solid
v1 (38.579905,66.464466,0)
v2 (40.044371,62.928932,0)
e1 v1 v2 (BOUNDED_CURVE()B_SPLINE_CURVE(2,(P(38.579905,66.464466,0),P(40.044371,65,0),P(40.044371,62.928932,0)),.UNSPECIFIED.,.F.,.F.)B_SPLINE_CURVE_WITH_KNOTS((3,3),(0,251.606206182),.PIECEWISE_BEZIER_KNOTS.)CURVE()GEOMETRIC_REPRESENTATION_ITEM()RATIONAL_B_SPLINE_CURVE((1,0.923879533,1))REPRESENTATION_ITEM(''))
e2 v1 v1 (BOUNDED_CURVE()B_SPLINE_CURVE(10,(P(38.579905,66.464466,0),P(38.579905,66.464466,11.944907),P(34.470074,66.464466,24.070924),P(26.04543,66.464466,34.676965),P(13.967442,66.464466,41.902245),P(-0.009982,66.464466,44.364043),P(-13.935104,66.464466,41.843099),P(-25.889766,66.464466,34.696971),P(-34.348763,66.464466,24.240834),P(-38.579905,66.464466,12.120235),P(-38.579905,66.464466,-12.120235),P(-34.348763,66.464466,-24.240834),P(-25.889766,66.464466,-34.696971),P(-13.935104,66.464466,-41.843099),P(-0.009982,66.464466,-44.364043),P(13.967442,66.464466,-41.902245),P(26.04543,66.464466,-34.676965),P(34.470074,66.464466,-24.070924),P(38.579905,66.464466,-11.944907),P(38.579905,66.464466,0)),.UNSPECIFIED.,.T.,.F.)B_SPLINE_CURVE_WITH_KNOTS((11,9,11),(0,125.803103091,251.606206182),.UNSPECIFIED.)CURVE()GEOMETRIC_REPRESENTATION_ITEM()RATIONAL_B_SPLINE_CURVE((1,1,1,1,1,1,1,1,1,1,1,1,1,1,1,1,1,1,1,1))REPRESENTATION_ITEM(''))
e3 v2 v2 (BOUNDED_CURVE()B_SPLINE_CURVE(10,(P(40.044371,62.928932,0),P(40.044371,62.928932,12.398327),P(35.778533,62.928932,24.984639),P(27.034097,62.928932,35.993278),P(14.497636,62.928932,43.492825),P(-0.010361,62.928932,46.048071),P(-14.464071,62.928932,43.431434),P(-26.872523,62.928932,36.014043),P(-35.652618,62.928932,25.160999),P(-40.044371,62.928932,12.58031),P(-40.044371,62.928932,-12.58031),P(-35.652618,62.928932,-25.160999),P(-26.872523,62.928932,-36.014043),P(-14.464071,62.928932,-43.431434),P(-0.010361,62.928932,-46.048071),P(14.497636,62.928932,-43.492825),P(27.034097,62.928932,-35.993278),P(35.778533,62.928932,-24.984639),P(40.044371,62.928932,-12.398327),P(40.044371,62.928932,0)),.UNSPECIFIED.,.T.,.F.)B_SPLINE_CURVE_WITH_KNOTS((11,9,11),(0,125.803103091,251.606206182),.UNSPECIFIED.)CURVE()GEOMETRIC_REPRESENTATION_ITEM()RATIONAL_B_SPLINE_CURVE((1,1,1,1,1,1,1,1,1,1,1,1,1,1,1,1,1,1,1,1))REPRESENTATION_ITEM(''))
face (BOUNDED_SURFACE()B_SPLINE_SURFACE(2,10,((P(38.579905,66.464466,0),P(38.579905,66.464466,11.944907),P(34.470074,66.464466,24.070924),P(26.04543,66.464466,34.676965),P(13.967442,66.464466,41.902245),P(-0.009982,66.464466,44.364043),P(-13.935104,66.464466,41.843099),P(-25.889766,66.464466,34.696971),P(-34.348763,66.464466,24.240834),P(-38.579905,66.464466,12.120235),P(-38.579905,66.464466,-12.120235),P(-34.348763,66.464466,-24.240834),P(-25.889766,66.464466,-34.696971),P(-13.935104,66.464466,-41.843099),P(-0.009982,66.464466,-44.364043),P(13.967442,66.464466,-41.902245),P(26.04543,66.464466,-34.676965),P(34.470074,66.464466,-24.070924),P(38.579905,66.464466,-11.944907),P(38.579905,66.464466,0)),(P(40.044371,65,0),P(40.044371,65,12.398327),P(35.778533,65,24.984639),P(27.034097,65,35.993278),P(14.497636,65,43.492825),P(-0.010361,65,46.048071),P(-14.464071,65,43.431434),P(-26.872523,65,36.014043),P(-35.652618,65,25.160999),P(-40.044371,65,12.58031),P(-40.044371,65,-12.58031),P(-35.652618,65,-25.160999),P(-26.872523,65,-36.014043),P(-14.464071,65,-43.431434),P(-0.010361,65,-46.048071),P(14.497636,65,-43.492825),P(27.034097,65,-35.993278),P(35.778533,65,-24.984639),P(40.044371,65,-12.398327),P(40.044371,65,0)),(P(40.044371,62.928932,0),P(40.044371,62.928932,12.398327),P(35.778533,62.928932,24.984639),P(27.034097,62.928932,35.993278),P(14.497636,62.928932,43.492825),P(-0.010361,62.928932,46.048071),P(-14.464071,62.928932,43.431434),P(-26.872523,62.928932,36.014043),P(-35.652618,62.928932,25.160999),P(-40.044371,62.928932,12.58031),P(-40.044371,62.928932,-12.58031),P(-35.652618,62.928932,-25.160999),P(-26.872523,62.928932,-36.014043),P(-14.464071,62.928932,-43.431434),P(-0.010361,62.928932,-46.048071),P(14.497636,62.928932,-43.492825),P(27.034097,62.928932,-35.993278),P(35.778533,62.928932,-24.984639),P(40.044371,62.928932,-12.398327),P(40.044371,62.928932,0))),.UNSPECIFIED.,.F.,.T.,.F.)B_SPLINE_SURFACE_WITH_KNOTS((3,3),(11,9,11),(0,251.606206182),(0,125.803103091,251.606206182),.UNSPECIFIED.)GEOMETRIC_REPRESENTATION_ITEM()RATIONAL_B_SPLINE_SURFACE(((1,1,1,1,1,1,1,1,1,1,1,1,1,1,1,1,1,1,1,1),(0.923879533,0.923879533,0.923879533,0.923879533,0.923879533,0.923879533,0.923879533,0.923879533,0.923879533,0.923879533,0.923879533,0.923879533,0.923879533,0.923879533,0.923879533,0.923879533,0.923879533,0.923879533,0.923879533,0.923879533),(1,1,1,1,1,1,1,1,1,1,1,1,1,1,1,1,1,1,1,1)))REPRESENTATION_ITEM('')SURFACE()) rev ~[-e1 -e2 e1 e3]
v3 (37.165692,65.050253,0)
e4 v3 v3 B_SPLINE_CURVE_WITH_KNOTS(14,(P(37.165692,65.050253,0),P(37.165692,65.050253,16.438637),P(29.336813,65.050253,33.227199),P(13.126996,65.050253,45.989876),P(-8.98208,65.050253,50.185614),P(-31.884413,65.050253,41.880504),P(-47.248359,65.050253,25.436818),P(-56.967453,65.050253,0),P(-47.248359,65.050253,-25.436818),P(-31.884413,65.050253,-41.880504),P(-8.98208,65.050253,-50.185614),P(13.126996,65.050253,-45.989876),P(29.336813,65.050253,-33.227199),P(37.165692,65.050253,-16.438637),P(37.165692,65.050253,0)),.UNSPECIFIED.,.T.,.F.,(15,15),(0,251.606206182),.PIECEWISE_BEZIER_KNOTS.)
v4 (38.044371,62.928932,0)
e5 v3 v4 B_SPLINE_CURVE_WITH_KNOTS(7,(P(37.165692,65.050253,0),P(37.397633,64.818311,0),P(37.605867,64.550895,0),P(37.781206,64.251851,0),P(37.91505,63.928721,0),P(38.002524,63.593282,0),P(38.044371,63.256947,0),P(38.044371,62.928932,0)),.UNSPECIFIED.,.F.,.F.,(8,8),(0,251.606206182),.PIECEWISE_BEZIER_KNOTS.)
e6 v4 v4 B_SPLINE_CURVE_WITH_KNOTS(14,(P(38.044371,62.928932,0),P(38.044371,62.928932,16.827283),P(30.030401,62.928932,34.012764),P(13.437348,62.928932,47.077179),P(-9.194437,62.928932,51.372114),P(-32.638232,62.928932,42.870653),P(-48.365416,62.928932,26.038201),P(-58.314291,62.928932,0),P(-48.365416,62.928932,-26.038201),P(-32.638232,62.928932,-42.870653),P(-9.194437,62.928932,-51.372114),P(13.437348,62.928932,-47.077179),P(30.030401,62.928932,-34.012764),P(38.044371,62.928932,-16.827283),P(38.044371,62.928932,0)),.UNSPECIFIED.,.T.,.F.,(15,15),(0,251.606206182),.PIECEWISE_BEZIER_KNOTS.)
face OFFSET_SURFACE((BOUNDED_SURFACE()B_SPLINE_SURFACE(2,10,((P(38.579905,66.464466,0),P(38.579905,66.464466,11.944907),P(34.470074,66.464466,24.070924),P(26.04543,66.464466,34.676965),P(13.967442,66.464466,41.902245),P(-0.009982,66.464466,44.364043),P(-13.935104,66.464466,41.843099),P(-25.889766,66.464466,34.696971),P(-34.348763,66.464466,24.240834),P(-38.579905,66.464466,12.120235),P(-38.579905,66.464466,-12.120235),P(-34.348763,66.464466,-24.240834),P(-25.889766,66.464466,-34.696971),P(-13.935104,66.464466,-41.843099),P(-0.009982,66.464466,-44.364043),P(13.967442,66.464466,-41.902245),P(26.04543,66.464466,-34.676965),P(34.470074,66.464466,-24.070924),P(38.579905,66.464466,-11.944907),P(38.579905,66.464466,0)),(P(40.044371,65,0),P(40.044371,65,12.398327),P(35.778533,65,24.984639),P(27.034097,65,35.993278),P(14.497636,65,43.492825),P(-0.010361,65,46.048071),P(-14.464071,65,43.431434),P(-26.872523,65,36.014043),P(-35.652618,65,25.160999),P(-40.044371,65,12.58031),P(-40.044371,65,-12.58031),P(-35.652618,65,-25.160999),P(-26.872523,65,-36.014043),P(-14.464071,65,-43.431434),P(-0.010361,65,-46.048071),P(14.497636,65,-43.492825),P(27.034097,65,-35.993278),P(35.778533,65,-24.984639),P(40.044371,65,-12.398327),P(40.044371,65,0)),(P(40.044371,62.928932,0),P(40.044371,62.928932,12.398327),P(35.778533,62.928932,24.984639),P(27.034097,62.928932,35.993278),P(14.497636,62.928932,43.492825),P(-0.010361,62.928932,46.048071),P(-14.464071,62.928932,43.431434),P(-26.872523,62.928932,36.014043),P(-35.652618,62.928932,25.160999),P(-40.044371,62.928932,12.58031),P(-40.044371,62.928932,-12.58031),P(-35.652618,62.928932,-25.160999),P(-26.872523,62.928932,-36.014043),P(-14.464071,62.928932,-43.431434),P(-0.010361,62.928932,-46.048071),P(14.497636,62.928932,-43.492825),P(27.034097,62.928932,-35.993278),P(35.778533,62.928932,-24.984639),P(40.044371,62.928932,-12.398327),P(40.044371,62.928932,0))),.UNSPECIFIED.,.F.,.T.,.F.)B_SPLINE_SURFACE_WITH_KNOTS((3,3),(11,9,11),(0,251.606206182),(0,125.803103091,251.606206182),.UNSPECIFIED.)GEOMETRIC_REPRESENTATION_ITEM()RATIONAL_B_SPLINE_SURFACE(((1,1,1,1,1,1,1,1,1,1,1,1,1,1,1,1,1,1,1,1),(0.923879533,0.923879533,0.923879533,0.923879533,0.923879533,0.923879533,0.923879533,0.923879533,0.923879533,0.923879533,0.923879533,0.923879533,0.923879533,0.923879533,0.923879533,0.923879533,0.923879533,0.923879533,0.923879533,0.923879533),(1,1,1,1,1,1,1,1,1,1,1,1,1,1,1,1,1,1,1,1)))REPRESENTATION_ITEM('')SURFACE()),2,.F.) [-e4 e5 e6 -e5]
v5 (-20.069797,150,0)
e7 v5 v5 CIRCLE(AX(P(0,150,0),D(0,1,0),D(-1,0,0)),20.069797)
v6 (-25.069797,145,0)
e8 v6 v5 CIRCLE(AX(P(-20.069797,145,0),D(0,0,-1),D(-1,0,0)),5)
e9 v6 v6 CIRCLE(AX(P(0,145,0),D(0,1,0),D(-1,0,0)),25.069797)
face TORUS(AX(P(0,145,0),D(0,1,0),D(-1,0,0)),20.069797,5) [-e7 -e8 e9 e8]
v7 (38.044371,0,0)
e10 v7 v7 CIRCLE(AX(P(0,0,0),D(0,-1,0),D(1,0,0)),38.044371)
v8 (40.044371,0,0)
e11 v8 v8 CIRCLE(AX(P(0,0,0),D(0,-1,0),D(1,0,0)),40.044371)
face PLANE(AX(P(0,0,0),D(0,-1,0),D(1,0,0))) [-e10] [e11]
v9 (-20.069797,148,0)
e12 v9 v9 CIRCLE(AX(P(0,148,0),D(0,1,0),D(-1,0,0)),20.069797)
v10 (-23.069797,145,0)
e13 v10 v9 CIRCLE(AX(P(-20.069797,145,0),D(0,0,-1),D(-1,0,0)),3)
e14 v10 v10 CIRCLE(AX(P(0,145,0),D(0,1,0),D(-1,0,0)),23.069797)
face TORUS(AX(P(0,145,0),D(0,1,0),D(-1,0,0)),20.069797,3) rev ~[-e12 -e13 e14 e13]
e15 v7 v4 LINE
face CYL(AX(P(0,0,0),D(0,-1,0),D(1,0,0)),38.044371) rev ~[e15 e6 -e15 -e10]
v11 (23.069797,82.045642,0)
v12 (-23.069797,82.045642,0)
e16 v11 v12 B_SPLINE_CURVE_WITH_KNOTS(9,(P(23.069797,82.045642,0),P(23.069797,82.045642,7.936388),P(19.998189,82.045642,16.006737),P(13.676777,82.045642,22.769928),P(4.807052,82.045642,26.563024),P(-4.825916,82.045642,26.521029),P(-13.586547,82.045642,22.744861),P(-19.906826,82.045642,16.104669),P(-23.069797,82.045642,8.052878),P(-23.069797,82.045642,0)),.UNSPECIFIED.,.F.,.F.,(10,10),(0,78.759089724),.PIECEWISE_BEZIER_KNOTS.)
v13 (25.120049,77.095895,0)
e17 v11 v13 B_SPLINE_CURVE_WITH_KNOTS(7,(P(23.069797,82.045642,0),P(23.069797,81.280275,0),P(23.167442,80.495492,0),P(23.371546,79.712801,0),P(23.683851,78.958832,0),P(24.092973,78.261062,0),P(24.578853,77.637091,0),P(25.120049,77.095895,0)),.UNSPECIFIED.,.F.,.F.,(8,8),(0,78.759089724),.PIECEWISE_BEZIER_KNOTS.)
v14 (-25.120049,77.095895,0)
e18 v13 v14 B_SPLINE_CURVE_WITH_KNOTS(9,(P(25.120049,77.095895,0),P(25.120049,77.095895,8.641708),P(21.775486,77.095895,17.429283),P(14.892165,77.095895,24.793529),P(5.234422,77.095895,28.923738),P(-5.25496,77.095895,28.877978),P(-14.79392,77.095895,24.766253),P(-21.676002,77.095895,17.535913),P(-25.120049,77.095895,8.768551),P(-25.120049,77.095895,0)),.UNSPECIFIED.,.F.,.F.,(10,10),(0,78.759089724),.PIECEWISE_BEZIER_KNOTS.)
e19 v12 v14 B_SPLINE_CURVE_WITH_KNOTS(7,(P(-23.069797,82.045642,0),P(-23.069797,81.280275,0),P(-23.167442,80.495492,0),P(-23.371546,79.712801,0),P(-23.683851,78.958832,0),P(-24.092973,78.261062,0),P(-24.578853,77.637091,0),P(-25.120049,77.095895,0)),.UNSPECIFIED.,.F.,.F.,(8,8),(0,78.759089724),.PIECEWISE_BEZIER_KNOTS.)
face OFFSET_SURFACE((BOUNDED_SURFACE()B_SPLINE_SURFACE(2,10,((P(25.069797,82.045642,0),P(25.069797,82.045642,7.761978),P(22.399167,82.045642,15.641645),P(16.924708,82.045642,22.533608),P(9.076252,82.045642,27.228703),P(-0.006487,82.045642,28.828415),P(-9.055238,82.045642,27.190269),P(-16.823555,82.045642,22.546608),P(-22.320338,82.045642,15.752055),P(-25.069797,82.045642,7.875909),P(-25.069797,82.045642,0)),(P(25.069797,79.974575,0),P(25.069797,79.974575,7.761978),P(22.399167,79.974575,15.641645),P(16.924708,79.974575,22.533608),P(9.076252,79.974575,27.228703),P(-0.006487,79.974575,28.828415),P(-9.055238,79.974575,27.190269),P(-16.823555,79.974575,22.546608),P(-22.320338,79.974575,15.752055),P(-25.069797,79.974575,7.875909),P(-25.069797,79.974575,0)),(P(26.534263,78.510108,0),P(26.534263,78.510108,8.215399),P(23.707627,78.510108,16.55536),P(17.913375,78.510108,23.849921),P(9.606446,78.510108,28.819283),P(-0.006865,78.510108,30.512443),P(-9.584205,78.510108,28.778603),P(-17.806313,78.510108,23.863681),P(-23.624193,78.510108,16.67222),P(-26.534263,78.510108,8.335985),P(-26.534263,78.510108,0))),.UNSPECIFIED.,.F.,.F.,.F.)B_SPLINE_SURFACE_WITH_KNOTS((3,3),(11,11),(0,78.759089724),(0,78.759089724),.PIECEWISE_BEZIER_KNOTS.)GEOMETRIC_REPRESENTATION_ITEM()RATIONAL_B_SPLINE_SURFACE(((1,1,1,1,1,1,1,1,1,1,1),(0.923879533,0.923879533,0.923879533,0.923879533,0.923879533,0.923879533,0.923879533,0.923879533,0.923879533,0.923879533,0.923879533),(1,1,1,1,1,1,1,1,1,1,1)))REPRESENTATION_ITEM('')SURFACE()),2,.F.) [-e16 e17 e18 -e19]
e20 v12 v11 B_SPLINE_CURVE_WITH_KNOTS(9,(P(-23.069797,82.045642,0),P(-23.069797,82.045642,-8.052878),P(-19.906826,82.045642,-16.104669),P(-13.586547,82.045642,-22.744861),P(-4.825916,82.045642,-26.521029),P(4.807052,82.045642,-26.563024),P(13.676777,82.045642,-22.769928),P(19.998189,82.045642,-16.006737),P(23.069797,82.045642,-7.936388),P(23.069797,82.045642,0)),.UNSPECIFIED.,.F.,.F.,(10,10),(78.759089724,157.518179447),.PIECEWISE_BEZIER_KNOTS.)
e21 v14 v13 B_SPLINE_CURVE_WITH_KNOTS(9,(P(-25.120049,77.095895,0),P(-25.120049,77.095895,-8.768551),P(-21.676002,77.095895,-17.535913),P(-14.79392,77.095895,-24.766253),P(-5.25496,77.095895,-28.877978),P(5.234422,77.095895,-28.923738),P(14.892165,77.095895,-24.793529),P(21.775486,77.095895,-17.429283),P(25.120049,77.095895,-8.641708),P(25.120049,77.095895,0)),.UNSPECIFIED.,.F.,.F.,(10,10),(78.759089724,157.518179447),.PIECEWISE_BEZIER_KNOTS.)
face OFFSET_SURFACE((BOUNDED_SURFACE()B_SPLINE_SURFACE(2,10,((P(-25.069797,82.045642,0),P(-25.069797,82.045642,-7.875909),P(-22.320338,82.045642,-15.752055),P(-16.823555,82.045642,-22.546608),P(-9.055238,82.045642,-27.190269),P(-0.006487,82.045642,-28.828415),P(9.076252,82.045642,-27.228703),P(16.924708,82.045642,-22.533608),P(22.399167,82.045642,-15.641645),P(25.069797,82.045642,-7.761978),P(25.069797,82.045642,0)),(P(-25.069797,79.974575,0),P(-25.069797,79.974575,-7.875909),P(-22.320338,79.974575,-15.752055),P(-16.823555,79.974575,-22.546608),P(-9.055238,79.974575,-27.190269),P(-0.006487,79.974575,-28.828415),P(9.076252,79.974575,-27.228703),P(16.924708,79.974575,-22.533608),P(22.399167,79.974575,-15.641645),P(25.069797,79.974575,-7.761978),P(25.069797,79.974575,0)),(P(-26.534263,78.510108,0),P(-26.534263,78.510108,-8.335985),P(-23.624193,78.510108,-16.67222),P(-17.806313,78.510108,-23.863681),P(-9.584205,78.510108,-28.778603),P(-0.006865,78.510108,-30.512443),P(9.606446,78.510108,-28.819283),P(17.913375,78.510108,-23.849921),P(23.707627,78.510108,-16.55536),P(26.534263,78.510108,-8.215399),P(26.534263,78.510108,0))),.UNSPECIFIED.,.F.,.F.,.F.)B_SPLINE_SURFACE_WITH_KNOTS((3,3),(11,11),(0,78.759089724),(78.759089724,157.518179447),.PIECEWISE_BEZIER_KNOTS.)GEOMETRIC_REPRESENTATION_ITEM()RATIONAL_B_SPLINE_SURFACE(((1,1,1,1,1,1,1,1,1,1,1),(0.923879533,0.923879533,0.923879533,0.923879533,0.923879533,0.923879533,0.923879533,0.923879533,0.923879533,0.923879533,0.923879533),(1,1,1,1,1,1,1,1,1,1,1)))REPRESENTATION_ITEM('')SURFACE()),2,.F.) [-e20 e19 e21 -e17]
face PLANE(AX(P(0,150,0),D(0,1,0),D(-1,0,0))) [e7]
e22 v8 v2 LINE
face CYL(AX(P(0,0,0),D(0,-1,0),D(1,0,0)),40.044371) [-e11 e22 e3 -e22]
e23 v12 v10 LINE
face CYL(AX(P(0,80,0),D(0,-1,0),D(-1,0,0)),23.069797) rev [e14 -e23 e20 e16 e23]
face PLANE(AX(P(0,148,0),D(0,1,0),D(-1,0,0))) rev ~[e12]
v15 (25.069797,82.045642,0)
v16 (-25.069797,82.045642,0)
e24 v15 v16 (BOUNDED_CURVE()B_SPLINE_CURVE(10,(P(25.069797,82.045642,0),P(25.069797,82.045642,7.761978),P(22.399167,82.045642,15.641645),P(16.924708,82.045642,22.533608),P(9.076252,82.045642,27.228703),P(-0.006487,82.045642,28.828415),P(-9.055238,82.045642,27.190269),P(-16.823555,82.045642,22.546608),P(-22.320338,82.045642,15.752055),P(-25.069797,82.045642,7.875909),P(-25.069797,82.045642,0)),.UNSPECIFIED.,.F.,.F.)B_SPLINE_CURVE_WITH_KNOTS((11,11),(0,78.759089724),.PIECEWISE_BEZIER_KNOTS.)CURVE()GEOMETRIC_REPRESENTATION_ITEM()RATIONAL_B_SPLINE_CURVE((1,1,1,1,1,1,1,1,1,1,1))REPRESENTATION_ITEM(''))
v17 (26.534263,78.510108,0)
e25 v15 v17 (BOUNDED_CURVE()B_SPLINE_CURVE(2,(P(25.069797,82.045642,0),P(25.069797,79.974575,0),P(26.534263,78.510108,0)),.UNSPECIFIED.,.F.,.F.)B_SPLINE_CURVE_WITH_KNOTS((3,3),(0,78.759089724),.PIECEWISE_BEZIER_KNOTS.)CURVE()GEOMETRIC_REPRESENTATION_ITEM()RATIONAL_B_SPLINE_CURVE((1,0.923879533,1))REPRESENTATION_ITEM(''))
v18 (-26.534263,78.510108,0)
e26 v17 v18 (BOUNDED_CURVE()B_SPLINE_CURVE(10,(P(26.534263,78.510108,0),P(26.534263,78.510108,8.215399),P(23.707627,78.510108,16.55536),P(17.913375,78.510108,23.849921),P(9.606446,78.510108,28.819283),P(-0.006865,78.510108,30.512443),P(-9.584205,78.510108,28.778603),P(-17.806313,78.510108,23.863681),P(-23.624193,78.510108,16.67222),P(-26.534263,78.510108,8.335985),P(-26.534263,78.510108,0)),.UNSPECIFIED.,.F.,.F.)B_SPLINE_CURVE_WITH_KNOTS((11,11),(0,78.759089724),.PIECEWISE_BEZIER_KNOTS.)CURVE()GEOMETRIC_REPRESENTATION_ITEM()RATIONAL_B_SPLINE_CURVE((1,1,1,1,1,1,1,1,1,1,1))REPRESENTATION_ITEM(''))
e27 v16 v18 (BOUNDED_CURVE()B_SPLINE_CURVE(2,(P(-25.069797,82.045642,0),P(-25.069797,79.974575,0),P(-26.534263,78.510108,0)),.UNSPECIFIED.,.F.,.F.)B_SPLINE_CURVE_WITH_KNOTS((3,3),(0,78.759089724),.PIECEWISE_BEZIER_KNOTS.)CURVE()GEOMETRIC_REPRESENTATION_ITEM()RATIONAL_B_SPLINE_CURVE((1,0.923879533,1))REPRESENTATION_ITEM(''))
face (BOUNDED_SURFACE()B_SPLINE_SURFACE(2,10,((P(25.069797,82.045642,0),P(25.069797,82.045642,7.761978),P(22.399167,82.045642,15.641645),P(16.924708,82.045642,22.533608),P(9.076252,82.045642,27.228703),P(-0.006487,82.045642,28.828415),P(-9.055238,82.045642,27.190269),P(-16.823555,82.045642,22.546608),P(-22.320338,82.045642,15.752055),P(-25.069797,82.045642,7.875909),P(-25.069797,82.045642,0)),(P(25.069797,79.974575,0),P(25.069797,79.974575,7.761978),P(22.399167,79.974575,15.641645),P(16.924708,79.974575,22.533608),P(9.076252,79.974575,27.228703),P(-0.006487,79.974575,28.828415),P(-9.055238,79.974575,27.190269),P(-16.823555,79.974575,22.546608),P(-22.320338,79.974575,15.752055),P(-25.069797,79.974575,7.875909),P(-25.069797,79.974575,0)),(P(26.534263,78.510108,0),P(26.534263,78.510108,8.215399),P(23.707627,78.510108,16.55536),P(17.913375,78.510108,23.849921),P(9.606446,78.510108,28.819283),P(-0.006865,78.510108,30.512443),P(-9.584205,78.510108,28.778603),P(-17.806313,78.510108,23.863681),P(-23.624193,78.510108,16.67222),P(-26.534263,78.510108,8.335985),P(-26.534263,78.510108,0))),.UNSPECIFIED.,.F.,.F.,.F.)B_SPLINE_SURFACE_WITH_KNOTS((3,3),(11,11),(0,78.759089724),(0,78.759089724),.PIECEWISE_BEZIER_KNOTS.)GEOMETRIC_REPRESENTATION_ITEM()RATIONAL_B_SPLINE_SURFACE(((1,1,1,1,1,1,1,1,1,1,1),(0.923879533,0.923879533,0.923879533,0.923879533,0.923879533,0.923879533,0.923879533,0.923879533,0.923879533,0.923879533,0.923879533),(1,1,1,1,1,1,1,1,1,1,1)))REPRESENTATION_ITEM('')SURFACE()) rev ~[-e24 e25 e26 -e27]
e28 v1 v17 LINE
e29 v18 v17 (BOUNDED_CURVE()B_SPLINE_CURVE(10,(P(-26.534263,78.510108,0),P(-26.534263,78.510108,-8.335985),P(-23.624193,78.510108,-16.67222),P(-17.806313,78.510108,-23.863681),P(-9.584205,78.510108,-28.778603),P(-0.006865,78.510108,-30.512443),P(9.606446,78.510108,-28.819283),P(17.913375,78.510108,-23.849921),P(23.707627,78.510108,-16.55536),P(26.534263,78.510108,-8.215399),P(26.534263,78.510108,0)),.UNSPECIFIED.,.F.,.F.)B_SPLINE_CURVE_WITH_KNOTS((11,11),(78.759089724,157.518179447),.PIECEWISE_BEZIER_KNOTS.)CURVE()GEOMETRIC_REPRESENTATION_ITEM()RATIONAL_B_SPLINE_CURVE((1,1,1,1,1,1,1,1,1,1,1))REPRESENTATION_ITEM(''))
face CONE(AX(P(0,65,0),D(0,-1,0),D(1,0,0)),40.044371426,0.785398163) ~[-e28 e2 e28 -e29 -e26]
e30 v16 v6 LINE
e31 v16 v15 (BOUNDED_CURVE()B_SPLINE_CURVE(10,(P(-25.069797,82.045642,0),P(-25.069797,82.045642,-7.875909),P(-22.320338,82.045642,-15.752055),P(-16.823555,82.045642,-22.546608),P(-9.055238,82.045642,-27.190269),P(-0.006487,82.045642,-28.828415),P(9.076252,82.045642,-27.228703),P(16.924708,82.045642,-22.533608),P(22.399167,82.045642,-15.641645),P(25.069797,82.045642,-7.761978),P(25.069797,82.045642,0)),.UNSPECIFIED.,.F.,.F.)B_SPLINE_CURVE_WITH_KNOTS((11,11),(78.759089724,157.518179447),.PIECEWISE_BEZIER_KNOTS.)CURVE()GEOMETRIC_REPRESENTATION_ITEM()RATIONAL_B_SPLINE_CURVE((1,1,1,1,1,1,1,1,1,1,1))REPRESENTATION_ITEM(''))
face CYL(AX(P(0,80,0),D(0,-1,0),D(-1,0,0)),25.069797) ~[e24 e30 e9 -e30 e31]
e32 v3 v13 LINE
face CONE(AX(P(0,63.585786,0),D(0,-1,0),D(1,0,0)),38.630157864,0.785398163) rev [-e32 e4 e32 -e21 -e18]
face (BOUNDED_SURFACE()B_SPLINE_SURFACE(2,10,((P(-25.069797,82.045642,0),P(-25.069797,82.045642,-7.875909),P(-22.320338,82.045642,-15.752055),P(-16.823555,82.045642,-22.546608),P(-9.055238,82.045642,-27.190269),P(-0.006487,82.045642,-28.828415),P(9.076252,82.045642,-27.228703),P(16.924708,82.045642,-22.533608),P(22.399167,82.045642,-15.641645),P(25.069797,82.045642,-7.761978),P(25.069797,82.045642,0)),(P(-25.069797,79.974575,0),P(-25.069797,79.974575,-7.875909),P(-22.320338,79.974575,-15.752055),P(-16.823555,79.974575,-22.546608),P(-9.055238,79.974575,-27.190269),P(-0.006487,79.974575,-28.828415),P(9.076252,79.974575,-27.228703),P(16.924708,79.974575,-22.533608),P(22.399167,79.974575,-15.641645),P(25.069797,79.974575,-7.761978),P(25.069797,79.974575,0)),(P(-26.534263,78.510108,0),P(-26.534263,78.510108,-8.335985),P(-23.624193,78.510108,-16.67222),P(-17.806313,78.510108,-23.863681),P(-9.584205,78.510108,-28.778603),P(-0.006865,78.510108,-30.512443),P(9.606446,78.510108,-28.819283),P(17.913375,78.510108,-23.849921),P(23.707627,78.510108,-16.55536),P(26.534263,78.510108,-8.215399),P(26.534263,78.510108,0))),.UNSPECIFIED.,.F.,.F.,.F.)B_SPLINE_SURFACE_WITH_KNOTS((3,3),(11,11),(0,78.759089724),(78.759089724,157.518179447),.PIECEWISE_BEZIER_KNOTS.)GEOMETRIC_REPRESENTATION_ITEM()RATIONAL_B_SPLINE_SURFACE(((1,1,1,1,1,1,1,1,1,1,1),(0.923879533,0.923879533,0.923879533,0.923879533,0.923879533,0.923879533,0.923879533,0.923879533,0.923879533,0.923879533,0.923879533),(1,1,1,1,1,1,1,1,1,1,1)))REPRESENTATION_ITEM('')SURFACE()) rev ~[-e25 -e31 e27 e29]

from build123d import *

# Parameters (mm, degrees)
F0_R        = 40.0443714264
F1_DEPTH    = 80
F2_R        = 25.0697968859
F3_DEPTH    = 70
F4_S5_R     = 25.0697968859
F4_T6_DEPTH = 59
F5_R        = 5
F6_R        = 5
F7_T        = -2


# Not quite as in the source:
# - a fillet or chamfer that OpenCascade refuses, or shapes differently, is made with other operations: its cross-section is extruded or revolved along the edge and cut away or added


with BuildPart() as f1:
    # F0 (on Front) → F1 (new body)
    with BuildSketch(Plane.XZ):
        Circle(F0_R)
    extrude(amount=-F1_DEPTH)

    # F2 (on face) → F3 (join)
    with BuildSketch(Plane(origin=(0, 80, 0), x_dir=(-1, 0, 0), z_dir=(0, 1, 0))):
        Circle(F2_R)
    extrude(amount=F3_DEPTH)

    # F4: chamfer of 15 on 1 edges, made by hand


with BuildPart() as f4_tool2:
    # F4_s3 → F4_t4 (revolve)
    with BuildSketch(Plane.XY):
        Polygon((40.0443714264, 65), (25.0443714264, 80), (40.0443714264, 80), align=None)
    revolve(axis=Axis((0, 80, 0), (0, -1, 0)))

    # F4_s5 → F4_t6 (cut, symmetric)
    with BuildSketch(Plane.XZ.offset(-72.5)):
        Circle(F4_S5_R)
    extrude(amount=F4_T6_DEPTH, both=True, mode=Mode.SUBTRACT)


with BuildPart() as f1_1:
    add(f1.part)

    # F4_t1: cut F4_tool2
    add(f4_tool2.part, mode=Mode.SUBTRACT)

    # F5
    f5_edges = [f1_1.edges().sort_by_distance(p)[0] for p in [
        (25.069797, 150, 0),
    ]]
    fillet(f5_edges, radius=F5_R)

    # F6
    f6_edges = [f1_1.edges().sort_by_distance(p)[0] for p in [
        (32.557084, 72.487287, 0),
        (-25.069797, 79.974575, 0),
        (-40.044371, 65, 0),
    ]]
    fillet(f6_edges, radius=F6_R)

    # F7
    f7_openings = [f1_1.faces().sort_by_distance(p)[0] for p in [
        (0, 0, 0),
    ]]
    offset(amount=F7_T, openings=f7_openings)


solid = f1_1.part
